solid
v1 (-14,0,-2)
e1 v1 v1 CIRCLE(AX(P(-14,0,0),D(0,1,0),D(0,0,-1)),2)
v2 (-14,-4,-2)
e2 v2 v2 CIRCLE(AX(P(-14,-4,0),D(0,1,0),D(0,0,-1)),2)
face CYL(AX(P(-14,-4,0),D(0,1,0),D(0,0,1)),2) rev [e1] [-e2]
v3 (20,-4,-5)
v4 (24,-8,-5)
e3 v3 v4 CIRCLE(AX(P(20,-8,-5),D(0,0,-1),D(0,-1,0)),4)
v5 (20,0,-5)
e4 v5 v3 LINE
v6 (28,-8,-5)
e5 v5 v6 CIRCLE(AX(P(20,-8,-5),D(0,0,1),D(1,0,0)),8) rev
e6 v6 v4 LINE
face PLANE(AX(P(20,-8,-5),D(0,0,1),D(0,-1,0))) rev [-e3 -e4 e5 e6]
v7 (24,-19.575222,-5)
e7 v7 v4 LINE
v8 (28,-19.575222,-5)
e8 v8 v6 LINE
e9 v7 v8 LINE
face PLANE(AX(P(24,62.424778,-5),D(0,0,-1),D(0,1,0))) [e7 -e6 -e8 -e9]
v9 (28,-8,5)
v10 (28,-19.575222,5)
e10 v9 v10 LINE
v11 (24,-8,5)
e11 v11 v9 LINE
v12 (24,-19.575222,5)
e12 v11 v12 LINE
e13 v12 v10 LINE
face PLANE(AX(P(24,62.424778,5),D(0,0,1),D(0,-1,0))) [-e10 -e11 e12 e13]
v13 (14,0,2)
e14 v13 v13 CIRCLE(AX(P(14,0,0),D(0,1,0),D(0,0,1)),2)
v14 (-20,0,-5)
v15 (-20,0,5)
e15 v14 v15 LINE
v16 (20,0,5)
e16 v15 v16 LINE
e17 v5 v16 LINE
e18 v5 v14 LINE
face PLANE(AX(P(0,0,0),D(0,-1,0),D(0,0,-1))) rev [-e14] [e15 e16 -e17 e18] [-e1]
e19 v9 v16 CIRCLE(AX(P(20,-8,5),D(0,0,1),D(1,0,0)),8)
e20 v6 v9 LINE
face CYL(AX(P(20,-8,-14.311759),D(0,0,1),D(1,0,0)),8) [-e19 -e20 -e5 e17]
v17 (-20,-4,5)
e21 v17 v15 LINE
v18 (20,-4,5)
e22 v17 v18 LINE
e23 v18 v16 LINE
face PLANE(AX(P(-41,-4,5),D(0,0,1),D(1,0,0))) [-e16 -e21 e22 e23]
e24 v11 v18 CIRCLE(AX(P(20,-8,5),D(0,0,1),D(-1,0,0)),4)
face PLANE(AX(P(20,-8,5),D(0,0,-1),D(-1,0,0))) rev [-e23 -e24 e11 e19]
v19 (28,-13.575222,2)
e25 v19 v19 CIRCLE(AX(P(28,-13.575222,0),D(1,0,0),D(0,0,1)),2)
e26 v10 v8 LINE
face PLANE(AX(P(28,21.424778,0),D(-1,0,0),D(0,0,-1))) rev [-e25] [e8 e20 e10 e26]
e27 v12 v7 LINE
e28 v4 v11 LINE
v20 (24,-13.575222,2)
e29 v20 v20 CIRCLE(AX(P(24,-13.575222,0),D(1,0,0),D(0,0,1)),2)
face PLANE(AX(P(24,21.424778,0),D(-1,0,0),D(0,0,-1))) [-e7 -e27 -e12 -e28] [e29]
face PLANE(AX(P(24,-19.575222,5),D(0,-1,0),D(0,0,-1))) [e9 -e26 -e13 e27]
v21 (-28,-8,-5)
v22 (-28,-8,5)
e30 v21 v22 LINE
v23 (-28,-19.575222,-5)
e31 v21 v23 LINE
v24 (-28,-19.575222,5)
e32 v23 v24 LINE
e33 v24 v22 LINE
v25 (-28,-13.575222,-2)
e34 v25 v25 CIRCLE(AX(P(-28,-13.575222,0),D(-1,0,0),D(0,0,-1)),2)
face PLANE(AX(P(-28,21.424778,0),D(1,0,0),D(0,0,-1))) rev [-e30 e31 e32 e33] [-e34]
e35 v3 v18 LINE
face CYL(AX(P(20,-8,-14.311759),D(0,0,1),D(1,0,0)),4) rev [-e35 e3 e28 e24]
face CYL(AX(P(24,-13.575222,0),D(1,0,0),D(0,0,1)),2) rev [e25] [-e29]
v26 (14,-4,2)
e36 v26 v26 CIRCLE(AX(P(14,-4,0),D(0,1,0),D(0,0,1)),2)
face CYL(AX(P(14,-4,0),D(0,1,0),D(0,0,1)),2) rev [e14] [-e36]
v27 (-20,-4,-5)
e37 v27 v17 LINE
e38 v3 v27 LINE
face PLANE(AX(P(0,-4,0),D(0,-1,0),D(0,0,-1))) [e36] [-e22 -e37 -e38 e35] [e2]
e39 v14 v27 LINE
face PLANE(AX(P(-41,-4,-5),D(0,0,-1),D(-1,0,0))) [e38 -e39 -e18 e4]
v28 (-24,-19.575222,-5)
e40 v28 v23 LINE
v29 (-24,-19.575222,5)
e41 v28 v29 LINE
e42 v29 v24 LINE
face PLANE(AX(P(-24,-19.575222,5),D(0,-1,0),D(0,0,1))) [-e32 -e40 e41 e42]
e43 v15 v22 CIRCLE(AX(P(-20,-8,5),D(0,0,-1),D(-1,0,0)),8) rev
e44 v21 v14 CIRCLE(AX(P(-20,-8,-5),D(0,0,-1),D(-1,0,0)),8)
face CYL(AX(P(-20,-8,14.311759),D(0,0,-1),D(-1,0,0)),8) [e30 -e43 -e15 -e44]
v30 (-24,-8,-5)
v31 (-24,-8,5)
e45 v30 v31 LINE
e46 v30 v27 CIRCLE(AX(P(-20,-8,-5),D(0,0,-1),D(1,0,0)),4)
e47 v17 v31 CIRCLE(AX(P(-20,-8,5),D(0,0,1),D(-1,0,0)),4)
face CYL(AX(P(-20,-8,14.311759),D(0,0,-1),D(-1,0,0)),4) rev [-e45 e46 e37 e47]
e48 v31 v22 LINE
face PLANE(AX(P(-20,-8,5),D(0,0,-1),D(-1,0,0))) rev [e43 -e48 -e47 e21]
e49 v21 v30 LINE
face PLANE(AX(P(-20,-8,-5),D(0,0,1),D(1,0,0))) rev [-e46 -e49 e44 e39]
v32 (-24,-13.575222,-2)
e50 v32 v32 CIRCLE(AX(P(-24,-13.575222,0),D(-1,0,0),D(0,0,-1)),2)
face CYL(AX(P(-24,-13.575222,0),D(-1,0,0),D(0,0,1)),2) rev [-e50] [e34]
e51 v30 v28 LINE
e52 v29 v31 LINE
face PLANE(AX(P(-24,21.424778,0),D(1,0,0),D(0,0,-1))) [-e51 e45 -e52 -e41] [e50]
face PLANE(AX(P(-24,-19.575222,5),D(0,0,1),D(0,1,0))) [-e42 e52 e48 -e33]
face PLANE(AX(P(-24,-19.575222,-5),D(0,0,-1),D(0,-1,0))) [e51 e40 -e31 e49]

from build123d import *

# Parameters (mm, degrees)
SKETCH1_W                  = 82
SKETCH1_H                  = 10
SKETCH1_R                  = 2
BASE_FLANGE1_DEPTH         = 4
SKETCHED_START             = -5
SKETCHED_BEND1_DEPTH       = 10
SKETCHED_BEND1_2_DEPTH     = 2.9999999
SKETCHED_START_2           = 2.0000001
SKETCHED_BEND1_3_DEPTH     = 2.9999999
SKETCHED_START_3           = -2.0000001
SKETCHED_BEND1_4_DEPTH     = 4.0000002
SKETCHED_START_4           = -28
SKETCHED_BEND1_5_OUTLINE_R = 2
SKETCHED_BEND1_5_DEPTH     = 56


with BuildPart() as part:
    # Base-Flange1: sheet metal written as solids
    # Sketch1 → Base-Flange1 (new body)
    with BuildSketch(Plane(origin=(0, 0, 0), x_dir=(1, 0, 0), z_dir=(0, 1, 0))):
        Rectangle(SKETCH1_W, SKETCH1_H)
        with Locations(Location((14, 0, 0), (0, 0, 270))):
            Circle(SKETCH1_R, mode=Mode.SUBTRACT)
        with Locations(Location((35, 0, 0), (0, 0, 270))):
            Circle(SKETCH1_R, mode=Mode.SUBTRACT)
        with Locations(Location((-35, 0, 0), (0, 0, 90))):
            Circle(SKETCH1_R, mode=Mode.SUBTRACT)
        with Locations(Location((-14, 0, 0), (0, 0, 90))):
            Circle(SKETCH1_R, mode=Mode.SUBTRACT)
    extrude(amount=-BASE_FLANGE1_DEPTH)

    # Sketched Bend1: read off the stored shape, not the designer's step
    # Sketched Bend1 outline → Sketched Bend1 (cut)
    with BuildSketch(Plane.XY.offset(SKETCHED_START)):
        with BuildLine():
            ThreePointArc((20, 0), (23.999999999, -1.07179677), (26.92820323, -4))
            Line((26.92820323, -4), (41, -4))
            Line((41, -4), (41, 0))
            Line((41, 0), (20, 0))
        make_face()
        with BuildLine():
            Line((-41, -4), (-26.92820323, -4))
            ThreePointArc((-26.92820323, -4), (-23.999999999, -1.07179677), (-20, 0))
            Line((-20, 0), (-41, 0))
            Line((-41, 0), (-41, -4))
        make_face()
    extrude(amount=SKETCHED_BEND1_DEPTH, mode=Mode.SUBTRACT)

    # Sketched Bend1 2 outline → Sketched Bend1 2 (add)
    with BuildSketch(Plane.XY.offset(SKETCHED_START)):
        with BuildLine():
            ThreePointArc((20, -4), (22.828427125, -5.171572875), (24, -8))
            Line((24, -8), (24, -19.575222039))
            Line((24, -19.575222039), (28, -19.575222039))
            Line((28, -19.575222039), (28, -8))
            ThreePointArc((28, -8), (27.72740661, -5.929447639), (26.92820323, -4))
            Line((26.92820323, -4), (20, -4))
        make_face()
        with BuildLine():
            ThreePointArc((-24, -8), (-22.828427125, -5.171572875), (-20, -4))
            Line((-20, -4), (-26.92820323, -4))
            ThreePointArc((-26.92820323, -4), (-27.72740661, -5.929447639), (-28, -8))
            Line((-28, -8), (-28, -19.575222039))
            Line((-28, -19.575222039), (-24, -19.575222039))
            Line((-24, -19.575222039), (-24, -8))
        make_face()
    extrude(amount=SKETCHED_BEND1_2_DEPTH)

    # Sketched Bend1 3 outline → Sketched Bend1 3 (add)
    with BuildSketch(Plane.XY.offset(SKETCHED_START_2)):
        with BuildLine():
            ThreePointArc((20, -4), (22.828427125, -5.171572875), (24, -8))
            Line((24, -8), (24, -19.575222039))
            Line((24, -19.575222039), (28, -19.575222039))
            Line((28, -19.575222039), (28, -8))
            ThreePointArc((28, -8), (27.72740661, -5.929447639), (26.92820323, -4))
            Line((26.92820323, -4), (20, -4))
        make_face()
        with BuildLine():
            ThreePointArc((-24, -8), (-22.828427125, -5.171572875), (-20, -4))
            Line((-20, -4), (-26.92820323, -4))
            ThreePointArc((-26.92820323, -4), (-27.72740661, -5.929447639), (-28, -8))
            Line((-28, -8), (-28, -19.575222039))
            Line((-28, -19.575222039), (-24, -19.575222039))
            Line((-24, -19.575222039), (-24, -8))
        make_face()
    extrude(amount=SKETCHED_BEND1_3_DEPTH)

    # Sketched Bend1 4 outline → Sketched Bend1 4 (add)
    with BuildSketch(Plane.XY.offset(SKETCHED_START_3)):
        with BuildLine():
            ThreePointArc((-24, -8), (-22.828427125, -5.171572875), (-20, -4))
            Line((-20, -4), (-26.92820323, -4))
            ThreePointArc((-26.92820323, -4), (-27.72740661, -5.929447639), (-28, -8))
            Line((-28, -8), (-28, -19.575222039))
            Line((-28, -19.575222039), (-24, -19.575222039))
            Line((-24, -19.575222039), (-24, -8))
        make_face()
        with BuildLine():
            ThreePointArc((20, -4), (22.828427125, -5.171572875), (24, -8))
            Line((24, -8), (24, -19.575222039))
            Line((24, -19.575222039), (28, -19.575222039))
            Line((28, -19.575222039), (28, -8))
            ThreePointArc((28, -8), (27.72740661, -5.929447639), (26.92820323, -4))
            Line((26.92820323, -4), (20, -4))
        make_face()
    extrude(amount=SKETCHED_BEND1_4_DEPTH)

    # Sketched Bend1 5 outline → Sketched Bend1 5 (cut)
    with BuildSketch(Plane.YZ.offset(SKETCHED_START_4)):
        with Locations((-13.575222039, 0)):
            Circle(SKETCHED_BEND1_5_OUTLINE_R)
    extrude(amount=SKETCHED_BEND1_5_DEPTH, mode=Mode.SUBTRACT)


solid = part.part
